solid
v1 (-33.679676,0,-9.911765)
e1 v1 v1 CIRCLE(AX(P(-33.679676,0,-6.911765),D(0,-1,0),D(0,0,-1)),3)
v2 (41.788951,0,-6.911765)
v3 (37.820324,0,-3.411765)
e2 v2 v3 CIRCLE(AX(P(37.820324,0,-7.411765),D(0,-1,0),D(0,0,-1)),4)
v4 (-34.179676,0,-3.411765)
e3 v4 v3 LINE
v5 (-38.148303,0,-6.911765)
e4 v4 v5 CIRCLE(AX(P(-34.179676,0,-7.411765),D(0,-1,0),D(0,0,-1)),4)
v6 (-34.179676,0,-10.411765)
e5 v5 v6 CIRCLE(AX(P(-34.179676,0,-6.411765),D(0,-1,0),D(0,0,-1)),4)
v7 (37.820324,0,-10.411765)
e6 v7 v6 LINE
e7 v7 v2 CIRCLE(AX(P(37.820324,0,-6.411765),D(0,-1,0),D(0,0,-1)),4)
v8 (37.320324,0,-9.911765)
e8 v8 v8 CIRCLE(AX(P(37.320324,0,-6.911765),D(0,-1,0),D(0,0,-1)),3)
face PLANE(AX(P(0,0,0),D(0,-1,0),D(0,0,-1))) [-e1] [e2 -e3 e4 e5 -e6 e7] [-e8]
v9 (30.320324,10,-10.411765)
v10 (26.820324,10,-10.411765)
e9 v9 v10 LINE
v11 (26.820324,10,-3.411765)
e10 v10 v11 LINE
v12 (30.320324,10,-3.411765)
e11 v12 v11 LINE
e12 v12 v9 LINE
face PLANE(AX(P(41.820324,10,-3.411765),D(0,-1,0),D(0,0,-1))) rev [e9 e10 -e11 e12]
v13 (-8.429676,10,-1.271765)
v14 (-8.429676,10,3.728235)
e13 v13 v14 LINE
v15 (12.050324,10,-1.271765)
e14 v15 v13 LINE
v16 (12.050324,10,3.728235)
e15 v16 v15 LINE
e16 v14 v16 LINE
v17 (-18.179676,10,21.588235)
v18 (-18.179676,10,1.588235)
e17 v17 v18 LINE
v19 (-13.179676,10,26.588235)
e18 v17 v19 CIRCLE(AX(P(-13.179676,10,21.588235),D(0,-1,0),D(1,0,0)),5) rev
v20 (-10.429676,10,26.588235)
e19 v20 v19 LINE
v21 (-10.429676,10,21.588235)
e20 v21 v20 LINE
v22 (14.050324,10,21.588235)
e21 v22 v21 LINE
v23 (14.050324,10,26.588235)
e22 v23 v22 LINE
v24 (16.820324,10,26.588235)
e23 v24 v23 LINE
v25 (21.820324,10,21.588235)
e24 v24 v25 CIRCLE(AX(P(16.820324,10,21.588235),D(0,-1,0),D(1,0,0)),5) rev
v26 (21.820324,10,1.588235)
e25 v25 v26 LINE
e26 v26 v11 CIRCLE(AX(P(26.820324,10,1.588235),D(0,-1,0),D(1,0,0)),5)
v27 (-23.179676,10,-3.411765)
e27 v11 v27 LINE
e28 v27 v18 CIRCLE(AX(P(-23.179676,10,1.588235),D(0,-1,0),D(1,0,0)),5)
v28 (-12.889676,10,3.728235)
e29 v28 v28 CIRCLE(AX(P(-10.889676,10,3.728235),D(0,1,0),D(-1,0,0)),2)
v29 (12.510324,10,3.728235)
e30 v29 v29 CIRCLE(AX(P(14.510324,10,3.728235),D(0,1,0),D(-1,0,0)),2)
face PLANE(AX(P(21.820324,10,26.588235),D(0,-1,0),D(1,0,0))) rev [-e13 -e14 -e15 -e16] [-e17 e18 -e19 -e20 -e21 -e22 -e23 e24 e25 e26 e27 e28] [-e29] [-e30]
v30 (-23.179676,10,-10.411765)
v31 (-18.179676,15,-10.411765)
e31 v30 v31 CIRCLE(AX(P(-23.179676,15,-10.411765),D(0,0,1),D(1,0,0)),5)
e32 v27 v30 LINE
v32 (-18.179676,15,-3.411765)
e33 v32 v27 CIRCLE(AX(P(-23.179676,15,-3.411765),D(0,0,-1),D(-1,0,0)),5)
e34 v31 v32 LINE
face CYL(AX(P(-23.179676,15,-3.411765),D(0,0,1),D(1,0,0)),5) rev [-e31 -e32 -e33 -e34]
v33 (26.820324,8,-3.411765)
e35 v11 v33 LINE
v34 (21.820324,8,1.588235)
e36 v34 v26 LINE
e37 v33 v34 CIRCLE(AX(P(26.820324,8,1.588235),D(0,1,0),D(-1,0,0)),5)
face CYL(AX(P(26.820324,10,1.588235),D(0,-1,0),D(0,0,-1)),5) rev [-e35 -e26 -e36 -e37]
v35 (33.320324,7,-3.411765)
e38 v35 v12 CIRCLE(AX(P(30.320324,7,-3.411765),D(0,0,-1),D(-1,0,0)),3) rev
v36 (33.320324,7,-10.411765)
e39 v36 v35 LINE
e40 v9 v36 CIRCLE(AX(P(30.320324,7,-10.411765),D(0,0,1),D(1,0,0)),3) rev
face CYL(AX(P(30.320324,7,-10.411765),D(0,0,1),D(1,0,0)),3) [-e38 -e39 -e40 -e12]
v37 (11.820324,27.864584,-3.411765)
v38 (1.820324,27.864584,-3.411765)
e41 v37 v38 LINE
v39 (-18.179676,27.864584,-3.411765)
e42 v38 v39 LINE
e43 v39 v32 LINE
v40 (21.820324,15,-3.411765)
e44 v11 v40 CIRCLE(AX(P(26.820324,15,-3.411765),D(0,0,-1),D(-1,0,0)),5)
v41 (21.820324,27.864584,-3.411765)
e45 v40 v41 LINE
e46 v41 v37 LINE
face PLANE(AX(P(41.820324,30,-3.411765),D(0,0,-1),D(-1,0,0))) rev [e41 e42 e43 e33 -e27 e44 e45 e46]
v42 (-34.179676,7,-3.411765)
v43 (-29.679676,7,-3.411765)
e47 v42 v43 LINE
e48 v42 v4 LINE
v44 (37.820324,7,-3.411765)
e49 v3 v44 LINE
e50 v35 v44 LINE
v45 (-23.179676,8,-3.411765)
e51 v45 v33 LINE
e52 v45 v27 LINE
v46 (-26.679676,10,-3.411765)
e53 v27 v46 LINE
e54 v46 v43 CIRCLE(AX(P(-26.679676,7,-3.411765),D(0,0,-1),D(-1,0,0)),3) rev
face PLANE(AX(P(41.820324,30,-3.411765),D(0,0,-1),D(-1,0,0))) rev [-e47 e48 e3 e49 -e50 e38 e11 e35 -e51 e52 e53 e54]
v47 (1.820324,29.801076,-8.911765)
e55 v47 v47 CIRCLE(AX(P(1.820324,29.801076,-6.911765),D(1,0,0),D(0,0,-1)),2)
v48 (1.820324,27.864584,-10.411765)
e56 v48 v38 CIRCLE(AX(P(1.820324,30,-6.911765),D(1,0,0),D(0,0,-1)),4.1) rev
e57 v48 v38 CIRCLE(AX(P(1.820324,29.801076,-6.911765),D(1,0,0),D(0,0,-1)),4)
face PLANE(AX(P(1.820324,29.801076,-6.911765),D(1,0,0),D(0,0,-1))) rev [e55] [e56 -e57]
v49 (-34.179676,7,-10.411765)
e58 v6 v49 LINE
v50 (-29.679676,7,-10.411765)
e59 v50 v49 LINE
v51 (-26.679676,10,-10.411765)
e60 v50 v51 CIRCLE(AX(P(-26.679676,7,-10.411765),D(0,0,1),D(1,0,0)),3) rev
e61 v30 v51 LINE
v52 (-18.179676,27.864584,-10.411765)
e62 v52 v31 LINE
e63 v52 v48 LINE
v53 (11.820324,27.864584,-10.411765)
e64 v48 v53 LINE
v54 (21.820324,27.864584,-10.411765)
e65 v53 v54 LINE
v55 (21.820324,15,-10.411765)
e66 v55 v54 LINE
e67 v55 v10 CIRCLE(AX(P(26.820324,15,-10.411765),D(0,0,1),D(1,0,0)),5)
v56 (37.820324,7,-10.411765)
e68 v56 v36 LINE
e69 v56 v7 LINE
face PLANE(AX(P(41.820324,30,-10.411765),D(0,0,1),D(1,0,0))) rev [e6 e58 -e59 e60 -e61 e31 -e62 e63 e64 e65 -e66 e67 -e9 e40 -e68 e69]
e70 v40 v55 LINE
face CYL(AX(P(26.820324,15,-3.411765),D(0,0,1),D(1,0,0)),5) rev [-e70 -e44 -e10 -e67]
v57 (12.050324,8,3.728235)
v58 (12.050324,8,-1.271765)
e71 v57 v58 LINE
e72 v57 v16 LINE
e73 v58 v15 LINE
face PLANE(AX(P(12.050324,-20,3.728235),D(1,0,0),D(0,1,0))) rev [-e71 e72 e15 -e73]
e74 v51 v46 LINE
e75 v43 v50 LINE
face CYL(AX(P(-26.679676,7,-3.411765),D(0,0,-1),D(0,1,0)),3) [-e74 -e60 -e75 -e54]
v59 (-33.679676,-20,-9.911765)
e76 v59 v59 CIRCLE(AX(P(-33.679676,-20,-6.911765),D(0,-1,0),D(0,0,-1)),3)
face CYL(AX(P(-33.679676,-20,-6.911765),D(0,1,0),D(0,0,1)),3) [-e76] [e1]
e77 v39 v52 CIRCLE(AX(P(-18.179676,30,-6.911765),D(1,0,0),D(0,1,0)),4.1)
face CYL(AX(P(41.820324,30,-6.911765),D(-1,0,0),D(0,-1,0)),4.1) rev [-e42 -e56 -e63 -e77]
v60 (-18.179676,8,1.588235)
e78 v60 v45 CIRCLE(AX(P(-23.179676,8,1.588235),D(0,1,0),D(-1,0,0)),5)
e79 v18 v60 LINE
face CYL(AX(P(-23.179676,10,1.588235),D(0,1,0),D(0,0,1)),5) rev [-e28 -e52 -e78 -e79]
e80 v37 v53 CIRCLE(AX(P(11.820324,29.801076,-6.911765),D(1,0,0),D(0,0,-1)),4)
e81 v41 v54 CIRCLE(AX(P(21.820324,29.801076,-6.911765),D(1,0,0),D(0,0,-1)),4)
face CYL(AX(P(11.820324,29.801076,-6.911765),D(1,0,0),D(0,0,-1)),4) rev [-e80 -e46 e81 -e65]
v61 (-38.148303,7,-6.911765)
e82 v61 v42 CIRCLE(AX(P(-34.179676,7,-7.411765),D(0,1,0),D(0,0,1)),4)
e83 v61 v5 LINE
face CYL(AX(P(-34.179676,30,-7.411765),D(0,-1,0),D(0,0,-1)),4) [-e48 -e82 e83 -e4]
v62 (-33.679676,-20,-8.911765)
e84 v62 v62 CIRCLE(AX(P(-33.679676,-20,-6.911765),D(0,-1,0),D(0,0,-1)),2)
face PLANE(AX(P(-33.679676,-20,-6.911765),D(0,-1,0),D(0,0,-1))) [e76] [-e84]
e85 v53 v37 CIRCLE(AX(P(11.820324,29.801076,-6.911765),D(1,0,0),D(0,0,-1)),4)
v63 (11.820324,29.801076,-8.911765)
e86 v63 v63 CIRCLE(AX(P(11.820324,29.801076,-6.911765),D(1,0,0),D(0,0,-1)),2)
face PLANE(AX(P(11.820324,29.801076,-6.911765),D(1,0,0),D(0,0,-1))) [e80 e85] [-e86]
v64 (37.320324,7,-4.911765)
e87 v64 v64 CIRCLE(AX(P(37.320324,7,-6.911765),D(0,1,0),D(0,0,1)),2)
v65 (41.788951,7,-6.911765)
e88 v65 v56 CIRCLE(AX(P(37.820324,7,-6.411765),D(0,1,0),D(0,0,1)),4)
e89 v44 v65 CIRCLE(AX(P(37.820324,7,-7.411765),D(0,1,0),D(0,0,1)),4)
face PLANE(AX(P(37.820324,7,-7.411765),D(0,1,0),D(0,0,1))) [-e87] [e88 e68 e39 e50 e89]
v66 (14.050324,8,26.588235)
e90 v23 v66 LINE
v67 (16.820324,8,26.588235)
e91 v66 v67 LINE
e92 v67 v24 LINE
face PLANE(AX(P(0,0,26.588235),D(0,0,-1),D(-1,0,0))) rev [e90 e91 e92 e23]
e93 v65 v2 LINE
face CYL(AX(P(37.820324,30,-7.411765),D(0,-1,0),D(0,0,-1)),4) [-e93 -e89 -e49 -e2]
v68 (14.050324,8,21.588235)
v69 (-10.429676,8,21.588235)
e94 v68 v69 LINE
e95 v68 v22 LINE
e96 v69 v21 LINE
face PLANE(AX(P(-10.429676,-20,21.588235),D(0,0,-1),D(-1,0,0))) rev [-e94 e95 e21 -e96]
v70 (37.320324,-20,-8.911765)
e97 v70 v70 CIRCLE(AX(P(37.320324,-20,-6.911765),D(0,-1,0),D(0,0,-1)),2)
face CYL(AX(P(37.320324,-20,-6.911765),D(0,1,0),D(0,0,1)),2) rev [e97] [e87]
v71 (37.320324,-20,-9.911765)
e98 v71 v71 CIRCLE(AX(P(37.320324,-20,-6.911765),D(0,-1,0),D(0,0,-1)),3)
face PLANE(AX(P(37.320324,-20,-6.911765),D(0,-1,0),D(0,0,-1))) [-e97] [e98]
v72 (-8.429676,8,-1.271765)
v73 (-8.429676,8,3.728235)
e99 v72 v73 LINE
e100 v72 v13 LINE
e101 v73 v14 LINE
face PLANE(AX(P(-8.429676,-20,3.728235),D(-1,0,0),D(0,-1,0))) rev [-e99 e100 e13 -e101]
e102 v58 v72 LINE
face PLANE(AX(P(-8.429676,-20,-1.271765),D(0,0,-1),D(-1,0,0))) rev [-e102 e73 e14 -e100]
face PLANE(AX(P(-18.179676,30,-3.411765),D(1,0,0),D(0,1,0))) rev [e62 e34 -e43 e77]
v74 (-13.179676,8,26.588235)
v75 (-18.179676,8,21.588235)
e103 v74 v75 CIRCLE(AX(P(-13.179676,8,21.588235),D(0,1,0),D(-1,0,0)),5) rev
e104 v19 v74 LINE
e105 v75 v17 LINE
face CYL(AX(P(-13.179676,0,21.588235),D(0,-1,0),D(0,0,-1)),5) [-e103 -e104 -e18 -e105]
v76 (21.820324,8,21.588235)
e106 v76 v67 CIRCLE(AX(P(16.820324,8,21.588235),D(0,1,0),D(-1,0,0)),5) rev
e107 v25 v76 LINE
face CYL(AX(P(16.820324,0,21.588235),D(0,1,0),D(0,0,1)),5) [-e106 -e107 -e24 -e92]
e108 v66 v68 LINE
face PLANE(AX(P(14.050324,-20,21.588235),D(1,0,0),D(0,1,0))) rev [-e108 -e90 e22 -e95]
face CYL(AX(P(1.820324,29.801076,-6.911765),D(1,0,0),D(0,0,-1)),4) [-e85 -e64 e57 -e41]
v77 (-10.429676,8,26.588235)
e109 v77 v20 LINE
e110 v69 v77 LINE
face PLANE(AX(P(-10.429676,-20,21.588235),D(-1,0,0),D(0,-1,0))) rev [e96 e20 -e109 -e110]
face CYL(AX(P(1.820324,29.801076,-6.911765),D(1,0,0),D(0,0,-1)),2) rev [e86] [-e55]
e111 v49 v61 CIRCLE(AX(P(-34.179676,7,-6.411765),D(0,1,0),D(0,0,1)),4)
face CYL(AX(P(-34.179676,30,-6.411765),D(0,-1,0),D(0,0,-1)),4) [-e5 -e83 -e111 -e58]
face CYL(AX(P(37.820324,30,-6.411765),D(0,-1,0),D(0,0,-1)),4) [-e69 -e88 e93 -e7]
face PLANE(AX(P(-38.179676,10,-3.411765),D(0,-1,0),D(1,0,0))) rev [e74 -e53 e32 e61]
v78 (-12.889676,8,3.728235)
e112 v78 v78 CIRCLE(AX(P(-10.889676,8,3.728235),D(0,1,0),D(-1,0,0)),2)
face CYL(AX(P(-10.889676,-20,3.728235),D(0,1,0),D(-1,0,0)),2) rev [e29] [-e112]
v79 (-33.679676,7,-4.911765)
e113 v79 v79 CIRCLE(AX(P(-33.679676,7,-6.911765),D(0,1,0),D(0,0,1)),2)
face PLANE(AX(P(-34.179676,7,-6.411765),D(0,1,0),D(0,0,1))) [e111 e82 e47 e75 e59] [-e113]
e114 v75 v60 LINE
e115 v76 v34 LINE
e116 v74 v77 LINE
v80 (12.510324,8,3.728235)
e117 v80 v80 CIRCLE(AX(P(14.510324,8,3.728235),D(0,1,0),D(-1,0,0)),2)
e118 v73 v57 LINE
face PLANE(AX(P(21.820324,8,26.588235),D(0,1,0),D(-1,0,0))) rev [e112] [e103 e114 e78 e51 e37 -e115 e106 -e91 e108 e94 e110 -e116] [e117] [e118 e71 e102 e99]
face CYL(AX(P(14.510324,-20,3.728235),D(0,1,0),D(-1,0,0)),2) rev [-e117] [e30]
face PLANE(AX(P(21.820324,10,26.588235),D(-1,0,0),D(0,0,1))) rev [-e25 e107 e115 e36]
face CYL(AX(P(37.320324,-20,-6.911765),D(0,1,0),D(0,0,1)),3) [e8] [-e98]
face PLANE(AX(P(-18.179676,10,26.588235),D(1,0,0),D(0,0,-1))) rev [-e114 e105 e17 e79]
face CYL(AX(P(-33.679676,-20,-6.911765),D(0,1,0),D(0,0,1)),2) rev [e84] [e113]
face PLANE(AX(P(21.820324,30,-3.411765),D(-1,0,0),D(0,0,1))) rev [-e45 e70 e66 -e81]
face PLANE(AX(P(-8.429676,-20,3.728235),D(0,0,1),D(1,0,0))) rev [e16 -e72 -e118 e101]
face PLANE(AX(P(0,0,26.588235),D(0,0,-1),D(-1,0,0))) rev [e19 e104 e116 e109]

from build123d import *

# Parameters (mm, degrees)
SKETCH1_W           = 80
SKETCH1_H           = 7
BOSS_EXTRUDE1_DEPTH = 30
SKETCH2_R           = 3
SKETCH2_R_2         = 2
BOSS_EXTRUDE2_DEPTH = 20
SKETCH7_W           = 20
SKETCH7_H           = 20
CUT_EXTRUDE1_DEPTH  = 52.941693496
SKETCH9_R           = 4.1
CUT_EXTRUDE2_DEPTH  = 68.885232888
SKETCH11_R          = 4
SKETCH11_R_2        = 2
BOSS_EXTRUDE6_DEPTH = 20
FILLET1_R           = 5
FILLET2_R           = 4
SKETCH14_W          = 40
SKETCH14_H          = 2
BOSS_EXTRUDE8_DEPTH = 30
FILLET4_START       = 8
FILLET4_DEPTH       = 2
FILLET4_2_DEPTH     = 2
SKETCH15_R          = 2
CUT_EXTRUDE3_DEPTH  = 58.907259499
SKETCH16_W          = 20.48
SKETCH16_H          = 5
SKETCH16_W_2        = 24.48
CUT_EXTRUDE4_DEPTH  = 58.907259499
SKETCH11_2_R        = 4
SKETCH11_2_R_2      = 2
CUT_EXTRUDE5_DEPTH  = 10
CUT_EXTRUDE6_REACH  = 61.965
SKETCH17_R          = 2
CUT_EXTRUDE7_START  = -3
CUT_EXTRUDE7_DEPTH  = 3
FILLET5_R           = 3


with BuildPart() as part:
    # Sketch1 → Boss-Extrude1 (new body)
    with BuildSketch(Plane(origin=(0, 0, 0), x_dir=(1, 0, 0), z_dir=(0, 1, 0))):
        with Locations((1.820324284, 6.911764706)):
            Rectangle(SKETCH1_W, SKETCH1_H)
    extrude(amount=BOSS_EXTRUDE1_DEPTH)

    # Sketch2 → Boss-Extrude2 (add)
    # profile 1 of 2: a face of its own
    with BuildSketch(Plane.XZ):
        with Locations(Location((-33.679675716, -6.911764706, 0), (0, 0, 270))):
            Circle(SKETCH2_R)
        with Locations(Location((-33.679675716, -6.911764706, 0), (0, 0, 270))):
            Circle(SKETCH2_R_2, mode=Mode.SUBTRACT)
    # profile 2 of 2: a face of its own
    with BuildSketch(Plane.XZ):
        with Locations(Location((37.320324284, -6.911764706, 0), (0, 0, 270))):
            Circle(SKETCH2_R)
        with Locations(Location((37.320324284, -6.911764706, 0), (0, 0, 270))):
            Circle(SKETCH2_R_2, mode=Mode.SUBTRACT)
    extrude(amount=BOSS_EXTRUDE2_DEPTH)

    # Sketch7 → Cut-Extrude1 (cut, through all)
    with BuildSketch(Plane(origin=(0, 0, -10.411764706), x_dir=(-1, 0, 0), z_dir=(0, 0, -1))):
        with Locations((-31.820324284, 20)):
            Rectangle(SKETCH7_W, SKETCH7_H)
        with Locations((28.179675716, 20)):
            Rectangle(SKETCH7_W, SKETCH7_H)
    extrude(amount=-CUT_EXTRUDE1_DEPTH, mode=Mode.SUBTRACT)

    # Sketch9 → Cut-Extrude2 (cut, through all)
    with BuildSketch(Plane.ZY.offset(18.179675716)):
        with Locations((-6.911764706, 30)):
            Circle(SKETCH9_R)
    extrude(amount=-CUT_EXTRUDE2_DEPTH, mode=Mode.SUBTRACT)

    # Sketch11 → Boss-Extrude6 (add)
    with BuildSketch(Plane(origin=(21.820324284, 0, 0), x_dir=(0, 0, -1), z_dir=(1, 0, 0))):
        with Locations((6.911764706, 29.801076023)):
            Circle(SKETCH11_R)
        with Locations((6.911764706, 29.801076023)):
            Circle(SKETCH11_R_2, mode=Mode.SUBTRACT)
    extrude(amount=-BOSS_EXTRUDE6_DEPTH)

    # Fillet1
    fillet1_edges = [part.edges().sort_by_distance(p)[0] for p in [
        (21.820324284, 10, -6.911764706),
        (-18.179675716, 10, -6.911764706),
    ]]
    fillet(fillet1_edges, radius=FILLET1_R)

    # Fillet2
    # the kernel refuses this fillet: 4 mm, written as the material it takes off along each edge
    with BuildSketch(Plane(origin=(41.820324284, -10, -10.411764706), x_dir=(-1, 0, 0), z_dir=(0, 1, 0)), Plane(origin=(41.820324284, -10, -3.411764706), x_dir=(0, 0, -1), z_dir=(0, 1, 0))) as fillet2_piece_1:
        with BuildLine():
            CenterArc((FILLET2_R, FILLET2_R), FILLET2_R, 180, 90)
            Line((0, FILLET2_R), (0, 0))
            Line((0, 0), (FILLET2_R, 0))
        make_face()
    extrude(amount=30, mode=Mode.SUBTRACT)
    with BuildSketch(Plane(origin=(-38.179675716, -10, -3.411764706), x_dir=(0, 0, -1), z_dir=(0, 1, 0)), Plane(origin=(-38.179675716, -10, -10.411764706), x_dir=(1, 0, 0), z_dir=(0, 1, 0))) as fillet2_piece_2:
        with BuildLine():
            CenterArc((FILLET2_R, -FILLET2_R), FILLET2_R, 90, 90)
            Line((0, -FILLET2_R), (0, 0))
            Line((0, 0), (FILLET2_R, 0))
        make_face()
    extrude(amount=30, mode=Mode.SUBTRACT)

    # Sketch14 → Boss-Extrude8 (add)
    with BuildSketch(Plane.XY.offset(-3.411764706)):
        with Locations((1.820324284, 9)):
            Rectangle(SKETCH14_W, SKETCH14_H)
    extrude(amount=BOSS_EXTRUDE8_DEPTH)

    # Fillet4: read off the stored shape, not the designer's step
    # Fillet4 outline → Fillet4 (cut)
    with BuildSketch(Plane(origin=(0, 0, 0), x_dir=(1, 0, 0), z_dir=(0, 1, 0)).offset(FILLET4_START)):
        with BuildLine():
            Line((-18.179675716, -26.588235294), (-13.179675716, -26.588235294))
            ThreePointArc((-13.179675716, -26.588235294), (-16.715209622, -25.1237692), (-18.179675716, -21.588235294))
            Line((-18.179675716, -21.588235294), (-18.179675716, -26.588235294))
        make_face()
        with BuildLine():
            ThreePointArc((21.820324284, -21.588235294), (20.35585819, -25.123769199), (16.820324284, -26.588235294))
            Line((16.820324284, -26.588235294), (21.820324284, -26.588235294))
            Line((21.820324284, -26.588235294), (21.820324284, -21.588235294))
        make_face()
    extrude(amount=FILLET4_DEPTH, mode=Mode.SUBTRACT)

    # Fillet4 2 outline → Fillet4 2 (add)
    with BuildSketch(Plane(origin=(0, 0, 0), x_dir=(1, 0, 0), z_dir=(0, 1, 0)).offset(FILLET4_START)):
        with BuildLine():
            ThreePointArc((-23.179675716, 3.411764706), (-19.64414181, 1.947298611), (-18.179675716, -1.588235294))
            Line((-18.179675716, -1.588235294), (-18.179675716, 3.411764706))
            Line((-18.179675716, 3.411764706), (-23.179675716, 3.411764706))
        make_face()
        with BuildLine():
            Line((21.820324284, 3.411764706), (21.820324284, -1.588235294))
            ThreePointArc((21.820324284, -1.588235294), (23.284790378, 1.947298612), (26.820324284, 3.411764706))
            Line((26.820324284, 3.411764706), (21.820324284, 3.411764706))
        make_face()
    extrude(amount=FILLET4_2_DEPTH)

    # Sketch15 → Cut-Extrude3 (cut, through all)
    with BuildSketch(Plane(origin=(0, 10, 0), x_dir=(1, 0, 0), z_dir=(0, 1, 0))):
        with Locations(Location((-10.889675716, -3.728235294, 0), (0, 0, 180))):
            Circle(SKETCH15_R)
        with Locations(Location((14.510324284, -3.728235294, 0), (0, 0, 180))):
            Circle(SKETCH15_R)
    extrude(amount=-CUT_EXTRUDE3_DEPTH, mode=Mode.SUBTRACT)

    # Sketch16 → Cut-Extrude4 (cut, through all)
    with BuildSketch(Plane(origin=(0, 10, 0), x_dir=(1, 0, 0), z_dir=(0, 1, 0))):
        with Locations((1.810324284, -1.228235294)):
            Rectangle(SKETCH16_W, SKETCH16_H)
        with Locations((1.810324284, -24.088235294)):
            Rectangle(SKETCH16_W_2, SKETCH16_H)
    extrude(amount=-CUT_EXTRUDE4_DEPTH, mode=Mode.SUBTRACT)

    # Sketch11<2> → Cut-Extrude5 (cut)
    with BuildSketch(Plane(origin=(21.820324284, 0, 0), x_dir=(0, 0, -1), z_dir=(1, 0, 0))):
        with Locations((6.911764706, 29.801076023)):
            Circle(SKETCH11_2_R)
        with Locations((6.911764706, 29.801076023)):
            Circle(SKETCH11_2_R_2, mode=Mode.SUBTRACT)
    extrude(amount=-CUT_EXTRUDE5_DEPTH, mode=Mode.SUBTRACT)

    # Sketch17 → Cut-Extrude6 (cut, up to next)
    with BuildSketch(Plane.XZ, mode=Mode.PRIVATE) as cut_extrude6_sk1:
        with Locations(Location((37.320324284, -6.911764706, 0), (0, 0, 270))):
            Circle(SKETCH17_R)
    cut_extrude6_tool1 = extrude(cut_extrude6_sk1.sketch, amount=-CUT_EXTRUDE6_REACH, mode=Mode.PRIVATE) & part.part
    # Sketch17 → Cut-Extrude6 (cut, up to next)
    with BuildSketch(Plane.XZ, mode=Mode.PRIVATE) as cut_extrude6_sk2:
        with Locations((-33.679675716, -6.911764706)):
            Circle(SKETCH17_R)
    cut_extrude6_tool2 = extrude(cut_extrude6_sk2.sketch, amount=-CUT_EXTRUDE6_REACH, mode=Mode.PRIVATE) & part.part
    add(cut_extrude6_tool1.solids().sort_by_distance((37.320324, 0, -6.911765))[0], mode=Mode.SUBTRACT)
    add(cut_extrude6_tool2.solids().sort_by_distance((-33.679676, 0, -6.911765))[0], mode=Mode.SUBTRACT)

    # Sketch18 → Cut-Extrude7 (cut)
    with BuildSketch(Plane(origin=(0, 10, 0), x_dir=(1, 0, 0), z_dir=(0, 1, 0)).offset(CUT_EXTRUDE7_START)):
        with BuildLine():
            Line((37.820324284, 10.411764706), (33.320324284, 10.411764706))
            Line((33.320324284, 10.411764706), (33.320324284, 3.411764706))
            Line((33.320324284, 3.411764706), (37.820324284, 3.411764706))
            ThreePointArc((37.820324284, 3.411764706), (40.466075595, 4.411764706), (41.78895125, 6.911764706))
            ThreePointArc((41.78895125, 6.911764706), (40.466075595, 9.411764706), (37.820324284, 10.411764706))
        make_face()
        with BuildLine():
            Line((-34.179675716, 3.411764706), (-29.679675716, 3.411764706))
            Line((-29.679675716, 3.411764706), (-29.679675716, 10.411764706))
            Line((-29.679675716, 10.411764706), (-34.179675716, 10.411764706))
            ThreePointArc((-34.179675716, 10.411764706), (-36.825427028, 9.411764706), (-38.148302683, 6.911764706))
            ThreePointArc((-38.148302683, 6.911764706), (-36.825427028, 4.411764706), (-34.179675716, 3.411764706))
        make_face()
    extrude(amount=CUT_EXTRUDE7_DEPTH, mode=Mode.SUBTRACT)

    # Fillet5
    fillet5_edges = [part.edges().sort_by_distance(p)[0] for p in [
        (-29.679675716, 10, -6.911764706),
        (33.320324284, 10, -6.911764706),
    ]]
    fillet(fillet5_edges, radius=FILLET5_R - 0.0001)  # a hair under: the kernel refuses the full size


solid = part.part
